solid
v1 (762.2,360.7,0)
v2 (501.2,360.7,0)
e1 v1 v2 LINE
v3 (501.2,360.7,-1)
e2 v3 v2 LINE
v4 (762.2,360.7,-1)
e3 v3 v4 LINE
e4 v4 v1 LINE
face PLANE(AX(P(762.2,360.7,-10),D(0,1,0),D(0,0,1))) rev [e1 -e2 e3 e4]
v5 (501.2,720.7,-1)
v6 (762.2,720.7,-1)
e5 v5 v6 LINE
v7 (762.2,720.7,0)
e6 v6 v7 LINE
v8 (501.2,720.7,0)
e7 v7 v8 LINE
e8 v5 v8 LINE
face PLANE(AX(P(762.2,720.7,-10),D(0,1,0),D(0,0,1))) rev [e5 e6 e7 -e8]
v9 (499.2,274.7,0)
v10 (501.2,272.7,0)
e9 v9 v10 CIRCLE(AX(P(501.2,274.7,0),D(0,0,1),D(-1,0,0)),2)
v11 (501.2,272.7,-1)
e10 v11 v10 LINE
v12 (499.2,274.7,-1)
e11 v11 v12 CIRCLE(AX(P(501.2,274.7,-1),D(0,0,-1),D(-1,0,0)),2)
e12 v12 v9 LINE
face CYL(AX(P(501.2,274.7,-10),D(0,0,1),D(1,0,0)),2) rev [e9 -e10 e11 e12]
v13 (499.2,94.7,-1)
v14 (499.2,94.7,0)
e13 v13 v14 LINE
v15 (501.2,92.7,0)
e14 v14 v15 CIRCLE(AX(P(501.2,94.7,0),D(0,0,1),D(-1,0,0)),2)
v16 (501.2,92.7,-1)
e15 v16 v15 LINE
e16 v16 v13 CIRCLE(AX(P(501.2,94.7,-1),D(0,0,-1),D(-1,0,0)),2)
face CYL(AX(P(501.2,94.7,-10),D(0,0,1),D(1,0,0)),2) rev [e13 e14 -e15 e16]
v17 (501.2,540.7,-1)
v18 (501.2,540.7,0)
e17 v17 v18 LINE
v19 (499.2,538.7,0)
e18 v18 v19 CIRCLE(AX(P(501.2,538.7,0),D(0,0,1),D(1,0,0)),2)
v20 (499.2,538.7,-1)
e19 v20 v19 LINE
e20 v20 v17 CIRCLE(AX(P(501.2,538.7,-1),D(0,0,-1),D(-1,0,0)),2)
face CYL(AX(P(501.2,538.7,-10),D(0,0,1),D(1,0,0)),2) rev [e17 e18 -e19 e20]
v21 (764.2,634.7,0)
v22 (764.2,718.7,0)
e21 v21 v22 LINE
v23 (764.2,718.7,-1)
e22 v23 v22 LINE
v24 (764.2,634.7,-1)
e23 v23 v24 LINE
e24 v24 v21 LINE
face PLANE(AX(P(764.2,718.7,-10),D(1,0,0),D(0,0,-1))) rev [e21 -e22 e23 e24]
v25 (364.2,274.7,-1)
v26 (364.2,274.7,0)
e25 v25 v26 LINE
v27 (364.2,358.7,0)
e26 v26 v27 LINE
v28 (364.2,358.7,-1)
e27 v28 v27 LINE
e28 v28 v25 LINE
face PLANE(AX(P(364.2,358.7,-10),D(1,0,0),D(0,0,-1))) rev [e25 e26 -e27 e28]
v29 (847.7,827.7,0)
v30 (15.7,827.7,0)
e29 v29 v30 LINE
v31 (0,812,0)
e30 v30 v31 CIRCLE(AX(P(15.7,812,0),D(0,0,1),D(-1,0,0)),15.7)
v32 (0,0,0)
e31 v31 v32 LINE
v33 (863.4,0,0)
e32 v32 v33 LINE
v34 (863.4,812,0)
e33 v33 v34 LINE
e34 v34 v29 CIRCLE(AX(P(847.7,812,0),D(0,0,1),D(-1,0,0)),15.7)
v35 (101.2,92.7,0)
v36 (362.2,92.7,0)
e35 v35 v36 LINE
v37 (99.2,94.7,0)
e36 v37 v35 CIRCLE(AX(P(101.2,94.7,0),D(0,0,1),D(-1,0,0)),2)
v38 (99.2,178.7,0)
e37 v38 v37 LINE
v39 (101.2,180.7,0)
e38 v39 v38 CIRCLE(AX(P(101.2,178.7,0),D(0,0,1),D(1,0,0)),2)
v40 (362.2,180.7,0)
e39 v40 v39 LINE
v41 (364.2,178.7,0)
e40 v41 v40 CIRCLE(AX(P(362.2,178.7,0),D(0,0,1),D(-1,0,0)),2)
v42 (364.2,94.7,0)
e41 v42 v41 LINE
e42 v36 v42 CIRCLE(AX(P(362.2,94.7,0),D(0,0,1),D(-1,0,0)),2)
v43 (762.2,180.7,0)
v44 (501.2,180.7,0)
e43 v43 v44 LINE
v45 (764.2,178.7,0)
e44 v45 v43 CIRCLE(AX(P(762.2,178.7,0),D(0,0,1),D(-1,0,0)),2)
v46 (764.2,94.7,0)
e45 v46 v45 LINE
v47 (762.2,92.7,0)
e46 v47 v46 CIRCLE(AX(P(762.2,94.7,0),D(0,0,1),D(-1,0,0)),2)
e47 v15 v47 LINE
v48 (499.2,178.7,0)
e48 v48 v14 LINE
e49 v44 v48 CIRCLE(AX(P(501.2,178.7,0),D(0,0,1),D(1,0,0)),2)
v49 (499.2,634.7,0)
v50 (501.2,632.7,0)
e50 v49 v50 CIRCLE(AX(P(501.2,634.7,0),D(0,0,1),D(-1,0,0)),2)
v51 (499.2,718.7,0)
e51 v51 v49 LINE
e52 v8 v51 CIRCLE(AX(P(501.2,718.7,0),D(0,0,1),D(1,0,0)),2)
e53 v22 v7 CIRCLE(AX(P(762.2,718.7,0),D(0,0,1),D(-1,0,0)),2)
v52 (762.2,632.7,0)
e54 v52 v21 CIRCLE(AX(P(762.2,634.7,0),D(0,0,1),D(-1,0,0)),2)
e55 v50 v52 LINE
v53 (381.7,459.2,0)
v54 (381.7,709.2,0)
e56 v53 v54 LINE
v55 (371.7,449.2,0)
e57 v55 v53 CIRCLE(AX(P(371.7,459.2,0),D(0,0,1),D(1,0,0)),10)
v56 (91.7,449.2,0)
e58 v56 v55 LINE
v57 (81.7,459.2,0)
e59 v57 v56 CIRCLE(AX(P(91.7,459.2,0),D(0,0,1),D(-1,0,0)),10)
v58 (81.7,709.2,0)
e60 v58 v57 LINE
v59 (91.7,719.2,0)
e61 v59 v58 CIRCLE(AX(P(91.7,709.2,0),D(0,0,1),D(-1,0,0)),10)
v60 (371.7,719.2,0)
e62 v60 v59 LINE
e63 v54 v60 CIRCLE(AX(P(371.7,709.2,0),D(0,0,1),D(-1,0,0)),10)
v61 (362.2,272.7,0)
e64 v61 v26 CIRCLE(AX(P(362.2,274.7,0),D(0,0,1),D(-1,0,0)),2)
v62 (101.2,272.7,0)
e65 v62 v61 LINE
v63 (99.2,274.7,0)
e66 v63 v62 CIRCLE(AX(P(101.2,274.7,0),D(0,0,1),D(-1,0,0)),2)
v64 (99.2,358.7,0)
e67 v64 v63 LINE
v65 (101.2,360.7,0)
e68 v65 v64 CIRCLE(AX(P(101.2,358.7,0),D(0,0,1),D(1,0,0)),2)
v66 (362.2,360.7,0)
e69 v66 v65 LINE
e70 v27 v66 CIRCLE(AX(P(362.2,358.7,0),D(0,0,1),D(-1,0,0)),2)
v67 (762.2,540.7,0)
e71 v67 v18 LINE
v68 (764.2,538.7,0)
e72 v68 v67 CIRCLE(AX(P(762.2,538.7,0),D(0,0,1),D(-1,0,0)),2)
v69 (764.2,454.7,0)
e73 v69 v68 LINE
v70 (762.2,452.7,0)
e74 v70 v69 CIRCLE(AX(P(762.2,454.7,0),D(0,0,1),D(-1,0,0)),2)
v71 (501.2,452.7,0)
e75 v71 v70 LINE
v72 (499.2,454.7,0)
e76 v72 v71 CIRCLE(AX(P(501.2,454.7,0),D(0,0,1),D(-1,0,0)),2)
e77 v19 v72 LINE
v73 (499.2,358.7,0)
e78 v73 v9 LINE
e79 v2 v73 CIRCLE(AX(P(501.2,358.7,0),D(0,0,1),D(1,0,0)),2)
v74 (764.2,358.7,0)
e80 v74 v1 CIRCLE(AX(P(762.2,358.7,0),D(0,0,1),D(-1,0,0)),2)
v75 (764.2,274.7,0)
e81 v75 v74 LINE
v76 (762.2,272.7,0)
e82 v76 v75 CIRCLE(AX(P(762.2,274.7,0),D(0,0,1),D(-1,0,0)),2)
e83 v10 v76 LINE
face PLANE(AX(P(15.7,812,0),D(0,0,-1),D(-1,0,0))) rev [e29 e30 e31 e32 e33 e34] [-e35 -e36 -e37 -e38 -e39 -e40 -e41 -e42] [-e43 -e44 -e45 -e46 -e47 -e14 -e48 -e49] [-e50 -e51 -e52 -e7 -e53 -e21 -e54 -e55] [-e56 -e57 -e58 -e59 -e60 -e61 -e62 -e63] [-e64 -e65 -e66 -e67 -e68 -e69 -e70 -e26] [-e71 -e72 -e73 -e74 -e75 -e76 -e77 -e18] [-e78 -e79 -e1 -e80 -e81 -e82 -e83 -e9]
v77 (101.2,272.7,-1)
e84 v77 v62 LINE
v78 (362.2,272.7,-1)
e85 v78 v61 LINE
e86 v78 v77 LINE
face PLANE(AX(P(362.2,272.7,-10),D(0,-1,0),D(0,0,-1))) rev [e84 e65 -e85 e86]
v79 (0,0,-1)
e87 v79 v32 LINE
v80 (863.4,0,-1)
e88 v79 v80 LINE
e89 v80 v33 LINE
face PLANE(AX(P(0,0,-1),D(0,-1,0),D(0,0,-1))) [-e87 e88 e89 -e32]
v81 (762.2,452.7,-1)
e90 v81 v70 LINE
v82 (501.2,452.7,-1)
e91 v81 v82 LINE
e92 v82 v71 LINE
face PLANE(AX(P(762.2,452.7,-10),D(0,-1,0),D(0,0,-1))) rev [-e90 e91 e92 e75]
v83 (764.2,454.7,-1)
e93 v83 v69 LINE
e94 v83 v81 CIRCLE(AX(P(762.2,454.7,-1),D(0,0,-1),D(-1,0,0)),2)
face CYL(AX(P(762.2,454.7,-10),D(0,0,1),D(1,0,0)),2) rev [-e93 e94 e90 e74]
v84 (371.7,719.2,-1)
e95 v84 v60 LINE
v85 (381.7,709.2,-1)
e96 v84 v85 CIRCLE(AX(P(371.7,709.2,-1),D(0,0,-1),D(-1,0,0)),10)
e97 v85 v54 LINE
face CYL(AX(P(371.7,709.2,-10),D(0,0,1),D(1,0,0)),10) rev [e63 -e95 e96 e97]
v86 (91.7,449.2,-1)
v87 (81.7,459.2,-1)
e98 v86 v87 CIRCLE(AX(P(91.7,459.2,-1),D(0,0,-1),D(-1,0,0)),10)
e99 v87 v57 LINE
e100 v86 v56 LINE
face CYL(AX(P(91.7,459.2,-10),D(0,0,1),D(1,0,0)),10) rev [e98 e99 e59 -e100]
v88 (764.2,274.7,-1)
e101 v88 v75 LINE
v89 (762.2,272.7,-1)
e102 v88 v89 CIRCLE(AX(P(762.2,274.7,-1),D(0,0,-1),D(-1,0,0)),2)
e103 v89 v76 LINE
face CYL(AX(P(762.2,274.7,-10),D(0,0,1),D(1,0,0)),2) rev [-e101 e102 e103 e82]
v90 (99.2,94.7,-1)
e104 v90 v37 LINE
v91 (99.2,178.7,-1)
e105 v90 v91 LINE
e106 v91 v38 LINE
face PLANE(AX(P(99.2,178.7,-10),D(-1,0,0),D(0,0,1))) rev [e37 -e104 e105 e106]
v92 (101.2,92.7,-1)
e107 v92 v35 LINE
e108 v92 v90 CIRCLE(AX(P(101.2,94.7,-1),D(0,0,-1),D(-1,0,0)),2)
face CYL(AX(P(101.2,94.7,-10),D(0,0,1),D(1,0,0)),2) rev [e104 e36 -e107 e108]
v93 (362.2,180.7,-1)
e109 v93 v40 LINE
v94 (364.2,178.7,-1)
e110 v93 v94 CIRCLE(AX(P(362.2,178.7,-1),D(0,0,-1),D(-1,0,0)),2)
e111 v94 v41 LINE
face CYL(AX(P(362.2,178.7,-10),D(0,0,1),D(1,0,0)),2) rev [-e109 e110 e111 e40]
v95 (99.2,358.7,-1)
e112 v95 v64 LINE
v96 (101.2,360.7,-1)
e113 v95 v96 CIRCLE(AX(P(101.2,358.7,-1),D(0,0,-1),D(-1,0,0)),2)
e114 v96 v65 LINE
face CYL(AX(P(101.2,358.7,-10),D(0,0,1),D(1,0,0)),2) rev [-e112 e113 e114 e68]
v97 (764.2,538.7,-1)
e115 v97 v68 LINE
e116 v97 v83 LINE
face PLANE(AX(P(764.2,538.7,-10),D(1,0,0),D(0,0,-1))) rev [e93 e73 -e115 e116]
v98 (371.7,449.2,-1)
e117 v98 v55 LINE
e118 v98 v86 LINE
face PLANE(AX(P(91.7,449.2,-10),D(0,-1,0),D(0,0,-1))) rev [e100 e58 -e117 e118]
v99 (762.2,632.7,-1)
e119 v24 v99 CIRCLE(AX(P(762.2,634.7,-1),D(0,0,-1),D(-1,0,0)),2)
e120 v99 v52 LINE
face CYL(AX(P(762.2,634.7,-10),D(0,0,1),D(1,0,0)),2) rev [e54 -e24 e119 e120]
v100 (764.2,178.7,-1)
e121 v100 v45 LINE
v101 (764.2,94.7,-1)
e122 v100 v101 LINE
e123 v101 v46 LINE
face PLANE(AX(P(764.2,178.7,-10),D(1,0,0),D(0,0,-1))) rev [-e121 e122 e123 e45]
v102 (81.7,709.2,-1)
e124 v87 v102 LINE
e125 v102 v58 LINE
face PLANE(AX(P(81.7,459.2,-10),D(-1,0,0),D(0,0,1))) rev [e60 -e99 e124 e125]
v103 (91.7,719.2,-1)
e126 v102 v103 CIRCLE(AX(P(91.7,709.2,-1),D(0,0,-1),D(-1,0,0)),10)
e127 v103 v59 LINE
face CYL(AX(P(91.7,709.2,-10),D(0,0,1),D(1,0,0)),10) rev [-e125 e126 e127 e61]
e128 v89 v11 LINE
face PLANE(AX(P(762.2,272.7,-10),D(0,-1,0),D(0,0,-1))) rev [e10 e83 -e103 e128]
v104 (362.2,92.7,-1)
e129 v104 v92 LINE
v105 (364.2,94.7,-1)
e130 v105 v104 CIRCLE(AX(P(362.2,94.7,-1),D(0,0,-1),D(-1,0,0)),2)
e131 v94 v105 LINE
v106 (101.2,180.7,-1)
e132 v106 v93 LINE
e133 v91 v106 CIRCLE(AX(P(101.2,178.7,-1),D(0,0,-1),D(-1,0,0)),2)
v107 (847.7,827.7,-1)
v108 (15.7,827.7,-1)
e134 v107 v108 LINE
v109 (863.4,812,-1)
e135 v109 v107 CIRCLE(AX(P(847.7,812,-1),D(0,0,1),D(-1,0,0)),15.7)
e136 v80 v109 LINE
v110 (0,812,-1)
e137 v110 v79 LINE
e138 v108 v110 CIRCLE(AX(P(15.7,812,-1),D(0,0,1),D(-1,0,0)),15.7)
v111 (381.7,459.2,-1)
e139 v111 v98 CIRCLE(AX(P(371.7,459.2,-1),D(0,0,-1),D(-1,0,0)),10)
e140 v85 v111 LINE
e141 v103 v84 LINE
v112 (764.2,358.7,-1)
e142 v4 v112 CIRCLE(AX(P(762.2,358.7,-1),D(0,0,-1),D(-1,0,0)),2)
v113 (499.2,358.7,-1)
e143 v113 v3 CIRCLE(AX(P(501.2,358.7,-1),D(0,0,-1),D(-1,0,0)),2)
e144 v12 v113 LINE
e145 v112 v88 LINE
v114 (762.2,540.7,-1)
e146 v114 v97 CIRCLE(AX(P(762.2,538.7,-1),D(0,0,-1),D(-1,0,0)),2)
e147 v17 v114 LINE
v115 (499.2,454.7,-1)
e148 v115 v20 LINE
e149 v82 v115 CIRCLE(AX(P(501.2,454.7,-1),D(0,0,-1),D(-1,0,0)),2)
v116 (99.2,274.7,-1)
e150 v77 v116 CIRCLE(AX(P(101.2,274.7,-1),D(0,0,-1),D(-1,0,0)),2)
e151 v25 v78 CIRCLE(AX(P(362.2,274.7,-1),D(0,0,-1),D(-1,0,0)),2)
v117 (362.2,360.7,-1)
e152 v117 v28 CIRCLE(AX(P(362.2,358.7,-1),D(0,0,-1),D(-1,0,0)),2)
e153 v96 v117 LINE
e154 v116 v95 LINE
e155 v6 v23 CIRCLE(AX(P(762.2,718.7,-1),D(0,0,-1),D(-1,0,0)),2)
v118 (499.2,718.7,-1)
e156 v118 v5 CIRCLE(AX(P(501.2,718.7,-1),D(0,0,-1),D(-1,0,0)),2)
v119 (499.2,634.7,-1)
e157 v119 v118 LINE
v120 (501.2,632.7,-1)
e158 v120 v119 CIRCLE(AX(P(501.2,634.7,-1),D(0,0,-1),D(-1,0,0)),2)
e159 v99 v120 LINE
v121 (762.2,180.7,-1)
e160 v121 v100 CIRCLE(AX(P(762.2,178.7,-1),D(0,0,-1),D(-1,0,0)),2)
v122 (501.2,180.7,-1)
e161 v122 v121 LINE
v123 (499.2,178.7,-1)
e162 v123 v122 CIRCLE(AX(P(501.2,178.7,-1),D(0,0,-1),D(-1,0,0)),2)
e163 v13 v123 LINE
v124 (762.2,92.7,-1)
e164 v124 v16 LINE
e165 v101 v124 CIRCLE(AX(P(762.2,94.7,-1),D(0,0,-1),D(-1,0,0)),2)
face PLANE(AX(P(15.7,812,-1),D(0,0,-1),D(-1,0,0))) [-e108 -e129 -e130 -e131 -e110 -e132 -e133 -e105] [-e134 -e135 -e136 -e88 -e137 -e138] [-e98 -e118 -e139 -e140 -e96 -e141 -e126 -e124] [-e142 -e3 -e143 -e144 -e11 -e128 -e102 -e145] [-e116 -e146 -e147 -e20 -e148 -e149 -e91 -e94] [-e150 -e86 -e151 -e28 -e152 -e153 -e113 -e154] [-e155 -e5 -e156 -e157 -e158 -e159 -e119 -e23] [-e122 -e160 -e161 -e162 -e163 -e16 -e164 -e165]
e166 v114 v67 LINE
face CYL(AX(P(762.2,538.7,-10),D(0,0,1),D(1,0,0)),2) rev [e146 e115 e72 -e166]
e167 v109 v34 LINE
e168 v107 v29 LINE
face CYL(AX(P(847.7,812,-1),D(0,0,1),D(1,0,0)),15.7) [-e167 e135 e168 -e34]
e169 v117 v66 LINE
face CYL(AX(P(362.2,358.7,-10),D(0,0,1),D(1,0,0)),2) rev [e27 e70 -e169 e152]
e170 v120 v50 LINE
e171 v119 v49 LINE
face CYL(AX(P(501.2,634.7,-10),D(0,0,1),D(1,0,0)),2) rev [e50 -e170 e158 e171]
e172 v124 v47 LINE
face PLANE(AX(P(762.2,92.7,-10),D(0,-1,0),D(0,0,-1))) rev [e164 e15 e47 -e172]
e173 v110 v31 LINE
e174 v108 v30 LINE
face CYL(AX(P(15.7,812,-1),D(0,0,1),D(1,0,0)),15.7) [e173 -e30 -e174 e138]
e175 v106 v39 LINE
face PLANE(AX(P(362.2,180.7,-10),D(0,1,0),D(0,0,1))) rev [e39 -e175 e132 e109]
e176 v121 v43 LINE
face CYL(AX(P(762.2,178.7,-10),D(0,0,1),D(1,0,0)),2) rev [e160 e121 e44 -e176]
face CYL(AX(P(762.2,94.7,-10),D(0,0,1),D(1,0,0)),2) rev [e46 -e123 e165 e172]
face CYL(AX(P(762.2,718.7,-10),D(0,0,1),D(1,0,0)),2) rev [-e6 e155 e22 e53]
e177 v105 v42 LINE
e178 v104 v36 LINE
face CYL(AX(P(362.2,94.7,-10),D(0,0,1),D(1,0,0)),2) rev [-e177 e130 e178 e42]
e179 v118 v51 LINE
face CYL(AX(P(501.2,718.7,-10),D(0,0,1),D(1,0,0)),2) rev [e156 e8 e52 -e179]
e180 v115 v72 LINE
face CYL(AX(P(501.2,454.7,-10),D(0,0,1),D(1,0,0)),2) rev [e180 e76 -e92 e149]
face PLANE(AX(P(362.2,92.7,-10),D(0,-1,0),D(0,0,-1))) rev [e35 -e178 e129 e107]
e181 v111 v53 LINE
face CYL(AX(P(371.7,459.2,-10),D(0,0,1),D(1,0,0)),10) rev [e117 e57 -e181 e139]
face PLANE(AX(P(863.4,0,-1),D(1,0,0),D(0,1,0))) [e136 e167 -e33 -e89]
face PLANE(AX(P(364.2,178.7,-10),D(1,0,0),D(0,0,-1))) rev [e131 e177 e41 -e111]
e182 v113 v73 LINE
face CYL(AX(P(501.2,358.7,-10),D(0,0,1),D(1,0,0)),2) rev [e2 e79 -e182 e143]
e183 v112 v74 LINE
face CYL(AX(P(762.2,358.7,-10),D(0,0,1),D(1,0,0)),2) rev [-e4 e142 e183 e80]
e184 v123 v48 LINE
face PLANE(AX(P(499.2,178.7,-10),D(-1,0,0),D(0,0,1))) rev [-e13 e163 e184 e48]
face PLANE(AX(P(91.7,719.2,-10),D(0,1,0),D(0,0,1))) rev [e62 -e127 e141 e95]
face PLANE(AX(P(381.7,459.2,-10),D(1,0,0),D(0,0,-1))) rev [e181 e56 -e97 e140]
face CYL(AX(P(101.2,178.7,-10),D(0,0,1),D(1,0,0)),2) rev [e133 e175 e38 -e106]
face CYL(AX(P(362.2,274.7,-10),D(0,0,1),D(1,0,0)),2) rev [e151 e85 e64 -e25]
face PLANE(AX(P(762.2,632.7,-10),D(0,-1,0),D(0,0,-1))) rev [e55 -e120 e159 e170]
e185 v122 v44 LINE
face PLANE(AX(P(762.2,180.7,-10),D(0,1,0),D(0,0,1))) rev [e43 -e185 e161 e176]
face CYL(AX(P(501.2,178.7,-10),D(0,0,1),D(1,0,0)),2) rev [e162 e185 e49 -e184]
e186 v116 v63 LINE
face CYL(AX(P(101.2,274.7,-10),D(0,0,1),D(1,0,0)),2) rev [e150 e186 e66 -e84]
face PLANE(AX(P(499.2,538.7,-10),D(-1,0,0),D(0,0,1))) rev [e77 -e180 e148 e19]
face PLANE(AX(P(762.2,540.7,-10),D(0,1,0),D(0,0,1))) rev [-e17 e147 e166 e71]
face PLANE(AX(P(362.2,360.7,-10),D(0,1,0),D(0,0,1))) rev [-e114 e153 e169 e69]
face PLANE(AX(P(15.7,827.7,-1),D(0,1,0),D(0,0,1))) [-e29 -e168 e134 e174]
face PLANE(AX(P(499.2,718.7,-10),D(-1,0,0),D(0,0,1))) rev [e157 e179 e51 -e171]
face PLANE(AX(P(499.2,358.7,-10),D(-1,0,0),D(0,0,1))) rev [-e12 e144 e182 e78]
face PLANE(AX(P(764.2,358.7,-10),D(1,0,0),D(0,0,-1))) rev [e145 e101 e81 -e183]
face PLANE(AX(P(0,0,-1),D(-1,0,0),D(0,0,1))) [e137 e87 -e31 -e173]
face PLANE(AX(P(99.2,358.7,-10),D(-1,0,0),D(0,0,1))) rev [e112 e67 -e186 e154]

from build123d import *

# Parameters (mm, degrees)
BASE_FLANGE1_DEPTH = 1
CUT_EXTRUDE1_DEPTH = 10
CUT_EXTRUDE2_DEPTH = 10


# Sheet-metal steps are written as plain solids
with BuildPart() as part:
    # Sketch1 → Base-Flange1 (new body)
    with BuildSketch(Plane.XY):
        with BuildLine():
            Line((0, 0), (863.4, 0))
            Line((863.4, 0), (863.4, 812))
            ThreePointArc((863.4, 812), (858.801576465, 823.101576465), (847.7, 827.7))
            Line((847.7, 827.7), (15.7, 827.7))
            ThreePointArc((15.7, 827.7), (4.598423535, 823.101576465), (0, 812))
            Line((0, 812), (0, 0))
        make_face()
    extrude(amount=-BASE_FLANGE1_DEPTH)

    # Sketch9 → Cut-Extrude1 (cut)
    with BuildSketch(Plane.XY):
        with BuildLine():
            Line((762.2, 720.7), (501.2, 720.7))
            ThreePointArc((501.2, 720.7), (499.785786438, 720.114213562), (499.2, 718.7))
            Line((499.2, 718.7), (499.2, 634.7))
            ThreePointArc((499.2, 634.7), (499.785786438, 633.285786438), (501.2, 632.7))
            Line((501.2, 632.7), (762.2, 632.7))
            ThreePointArc((762.2, 632.7), (763.614213562, 633.285786438), (764.2, 634.7))
            Line((764.2, 634.7), (764.2, 718.7))
            ThreePointArc((764.2, 718.7), (763.614213562, 720.114213562), (762.2, 720.7))
        make_face()
        with BuildLine():
            Line((764.2, 538.7), (764.2, 454.7))
            ThreePointArc((764.2, 454.7), (763.614213562, 453.285786438), (762.2, 452.7))
            Line((762.2, 452.7), (501.2, 452.7))
            ThreePointArc((501.2, 452.7), (499.785786438, 453.285786438), (499.2, 454.7))
            Line((499.2, 454.7), (499.2, 538.7))
            ThreePointArc((499.2, 538.7), (499.785786438, 540.114213562), (501.2, 540.7))
            Line((501.2, 540.7), (762.2, 540.7))
            ThreePointArc((762.2, 540.7), (763.614213562, 540.114213562), (764.2, 538.7))
        make_face()
        with BuildLine():
            Line((764.2, 358.7), (764.2, 274.7))
            ThreePointArc((764.2, 274.7), (763.614213562, 273.285786438), (762.2, 272.7))
            Line((762.2, 272.7), (501.2, 272.7))
            ThreePointArc((501.2, 272.7), (499.785786438, 273.285786438), (499.2, 274.7))
            Line((499.2, 274.7), (499.2, 358.7))
            ThreePointArc((499.2, 358.7), (499.785786438, 360.114213562), (501.2, 360.7))
            Line((501.2, 360.7), (762.2, 360.7))
            ThreePointArc((762.2, 360.7), (763.614213562, 360.114213562), (764.2, 358.7))
        make_face()
        with BuildLine():
            Line((764.2, 178.7), (764.2, 94.7))
            ThreePointArc((764.2, 94.7), (763.614213562, 93.285786438), (762.2, 92.7))
            Line((762.2, 92.7), (501.2, 92.7))
            ThreePointArc((501.2, 92.7), (499.785786438, 93.285786438), (499.2, 94.7))
            Line((499.2, 94.7), (499.2, 178.7))
            ThreePointArc((499.2, 178.7), (499.785786438, 180.114213562), (501.2, 180.7))
            Line((501.2, 180.7), (762.2, 180.7))
            ThreePointArc((762.2, 180.7), (763.614213562, 180.114213562), (764.2, 178.7))
        make_face()
        with BuildLine():
            Line((364.2, 358.7), (364.2, 274.7))
            ThreePointArc((364.2, 274.7), (363.614213562, 273.285786438), (362.2, 272.7))
            Line((362.2, 272.7), (101.2, 272.7))
            ThreePointArc((101.2, 272.7), (99.785786438, 273.285786438), (99.2, 274.7))
            Line((99.2, 274.7), (99.2, 358.7))
            ThreePointArc((99.2, 358.7), (99.785786438, 360.114213562), (101.2, 360.7))
            Line((101.2, 360.7), (362.2, 360.7))
            ThreePointArc((362.2, 360.7), (363.614213562, 360.114213562), (364.2, 358.7))
        make_face()
        with BuildLine():
            Line((364.2, 178.7), (364.2, 94.7))
            ThreePointArc((364.2, 94.7), (363.614213562, 93.285786438), (362.2, 92.7))
            Line((362.2, 92.7), (101.2, 92.7))
            ThreePointArc((101.2, 92.7), (99.785786438, 93.285786438), (99.2, 94.7))
            Line((99.2, 94.7), (99.2, 178.7))
            ThreePointArc((99.2, 178.7), (99.785786438, 180.114213562), (101.2, 180.7))
            Line((101.2, 180.7), (362.2, 180.7))
            ThreePointArc((362.2, 180.7), (363.614213562, 180.114213562), (364.2, 178.7))
        make_face()
    extrude(amount=-CUT_EXTRUDE1_DEPTH, mode=Mode.SUBTRACT)

    # Sketch10 → Cut-Extrude2 (cut)
    with BuildSketch(Plane.XY):
        with BuildLine():
            Line((91.7, 449.2), (371.7, 449.2))
            ThreePointArc((371.7, 449.2), (378.771067812, 452.128932188), (381.7, 459.2))
            Line((381.7, 459.2), (381.7, 709.2))
            ThreePointArc((381.7, 709.2), (378.771067812, 716.271067812), (371.7, 719.2))
            Line((371.7, 719.2), (91.7, 719.2))
            ThreePointArc((91.7, 719.2), (84.628932188, 716.271067812), (81.7, 709.2))
            Line((81.7, 709.2), (81.7, 459.2))
            ThreePointArc((81.7, 459.2), (84.628932188, 452.128932188), (91.7, 449.2))
        make_face()
    extrude(amount=-CUT_EXTRUDE2_DEPTH, mode=Mode.SUBTRACT)


solid = part.part
